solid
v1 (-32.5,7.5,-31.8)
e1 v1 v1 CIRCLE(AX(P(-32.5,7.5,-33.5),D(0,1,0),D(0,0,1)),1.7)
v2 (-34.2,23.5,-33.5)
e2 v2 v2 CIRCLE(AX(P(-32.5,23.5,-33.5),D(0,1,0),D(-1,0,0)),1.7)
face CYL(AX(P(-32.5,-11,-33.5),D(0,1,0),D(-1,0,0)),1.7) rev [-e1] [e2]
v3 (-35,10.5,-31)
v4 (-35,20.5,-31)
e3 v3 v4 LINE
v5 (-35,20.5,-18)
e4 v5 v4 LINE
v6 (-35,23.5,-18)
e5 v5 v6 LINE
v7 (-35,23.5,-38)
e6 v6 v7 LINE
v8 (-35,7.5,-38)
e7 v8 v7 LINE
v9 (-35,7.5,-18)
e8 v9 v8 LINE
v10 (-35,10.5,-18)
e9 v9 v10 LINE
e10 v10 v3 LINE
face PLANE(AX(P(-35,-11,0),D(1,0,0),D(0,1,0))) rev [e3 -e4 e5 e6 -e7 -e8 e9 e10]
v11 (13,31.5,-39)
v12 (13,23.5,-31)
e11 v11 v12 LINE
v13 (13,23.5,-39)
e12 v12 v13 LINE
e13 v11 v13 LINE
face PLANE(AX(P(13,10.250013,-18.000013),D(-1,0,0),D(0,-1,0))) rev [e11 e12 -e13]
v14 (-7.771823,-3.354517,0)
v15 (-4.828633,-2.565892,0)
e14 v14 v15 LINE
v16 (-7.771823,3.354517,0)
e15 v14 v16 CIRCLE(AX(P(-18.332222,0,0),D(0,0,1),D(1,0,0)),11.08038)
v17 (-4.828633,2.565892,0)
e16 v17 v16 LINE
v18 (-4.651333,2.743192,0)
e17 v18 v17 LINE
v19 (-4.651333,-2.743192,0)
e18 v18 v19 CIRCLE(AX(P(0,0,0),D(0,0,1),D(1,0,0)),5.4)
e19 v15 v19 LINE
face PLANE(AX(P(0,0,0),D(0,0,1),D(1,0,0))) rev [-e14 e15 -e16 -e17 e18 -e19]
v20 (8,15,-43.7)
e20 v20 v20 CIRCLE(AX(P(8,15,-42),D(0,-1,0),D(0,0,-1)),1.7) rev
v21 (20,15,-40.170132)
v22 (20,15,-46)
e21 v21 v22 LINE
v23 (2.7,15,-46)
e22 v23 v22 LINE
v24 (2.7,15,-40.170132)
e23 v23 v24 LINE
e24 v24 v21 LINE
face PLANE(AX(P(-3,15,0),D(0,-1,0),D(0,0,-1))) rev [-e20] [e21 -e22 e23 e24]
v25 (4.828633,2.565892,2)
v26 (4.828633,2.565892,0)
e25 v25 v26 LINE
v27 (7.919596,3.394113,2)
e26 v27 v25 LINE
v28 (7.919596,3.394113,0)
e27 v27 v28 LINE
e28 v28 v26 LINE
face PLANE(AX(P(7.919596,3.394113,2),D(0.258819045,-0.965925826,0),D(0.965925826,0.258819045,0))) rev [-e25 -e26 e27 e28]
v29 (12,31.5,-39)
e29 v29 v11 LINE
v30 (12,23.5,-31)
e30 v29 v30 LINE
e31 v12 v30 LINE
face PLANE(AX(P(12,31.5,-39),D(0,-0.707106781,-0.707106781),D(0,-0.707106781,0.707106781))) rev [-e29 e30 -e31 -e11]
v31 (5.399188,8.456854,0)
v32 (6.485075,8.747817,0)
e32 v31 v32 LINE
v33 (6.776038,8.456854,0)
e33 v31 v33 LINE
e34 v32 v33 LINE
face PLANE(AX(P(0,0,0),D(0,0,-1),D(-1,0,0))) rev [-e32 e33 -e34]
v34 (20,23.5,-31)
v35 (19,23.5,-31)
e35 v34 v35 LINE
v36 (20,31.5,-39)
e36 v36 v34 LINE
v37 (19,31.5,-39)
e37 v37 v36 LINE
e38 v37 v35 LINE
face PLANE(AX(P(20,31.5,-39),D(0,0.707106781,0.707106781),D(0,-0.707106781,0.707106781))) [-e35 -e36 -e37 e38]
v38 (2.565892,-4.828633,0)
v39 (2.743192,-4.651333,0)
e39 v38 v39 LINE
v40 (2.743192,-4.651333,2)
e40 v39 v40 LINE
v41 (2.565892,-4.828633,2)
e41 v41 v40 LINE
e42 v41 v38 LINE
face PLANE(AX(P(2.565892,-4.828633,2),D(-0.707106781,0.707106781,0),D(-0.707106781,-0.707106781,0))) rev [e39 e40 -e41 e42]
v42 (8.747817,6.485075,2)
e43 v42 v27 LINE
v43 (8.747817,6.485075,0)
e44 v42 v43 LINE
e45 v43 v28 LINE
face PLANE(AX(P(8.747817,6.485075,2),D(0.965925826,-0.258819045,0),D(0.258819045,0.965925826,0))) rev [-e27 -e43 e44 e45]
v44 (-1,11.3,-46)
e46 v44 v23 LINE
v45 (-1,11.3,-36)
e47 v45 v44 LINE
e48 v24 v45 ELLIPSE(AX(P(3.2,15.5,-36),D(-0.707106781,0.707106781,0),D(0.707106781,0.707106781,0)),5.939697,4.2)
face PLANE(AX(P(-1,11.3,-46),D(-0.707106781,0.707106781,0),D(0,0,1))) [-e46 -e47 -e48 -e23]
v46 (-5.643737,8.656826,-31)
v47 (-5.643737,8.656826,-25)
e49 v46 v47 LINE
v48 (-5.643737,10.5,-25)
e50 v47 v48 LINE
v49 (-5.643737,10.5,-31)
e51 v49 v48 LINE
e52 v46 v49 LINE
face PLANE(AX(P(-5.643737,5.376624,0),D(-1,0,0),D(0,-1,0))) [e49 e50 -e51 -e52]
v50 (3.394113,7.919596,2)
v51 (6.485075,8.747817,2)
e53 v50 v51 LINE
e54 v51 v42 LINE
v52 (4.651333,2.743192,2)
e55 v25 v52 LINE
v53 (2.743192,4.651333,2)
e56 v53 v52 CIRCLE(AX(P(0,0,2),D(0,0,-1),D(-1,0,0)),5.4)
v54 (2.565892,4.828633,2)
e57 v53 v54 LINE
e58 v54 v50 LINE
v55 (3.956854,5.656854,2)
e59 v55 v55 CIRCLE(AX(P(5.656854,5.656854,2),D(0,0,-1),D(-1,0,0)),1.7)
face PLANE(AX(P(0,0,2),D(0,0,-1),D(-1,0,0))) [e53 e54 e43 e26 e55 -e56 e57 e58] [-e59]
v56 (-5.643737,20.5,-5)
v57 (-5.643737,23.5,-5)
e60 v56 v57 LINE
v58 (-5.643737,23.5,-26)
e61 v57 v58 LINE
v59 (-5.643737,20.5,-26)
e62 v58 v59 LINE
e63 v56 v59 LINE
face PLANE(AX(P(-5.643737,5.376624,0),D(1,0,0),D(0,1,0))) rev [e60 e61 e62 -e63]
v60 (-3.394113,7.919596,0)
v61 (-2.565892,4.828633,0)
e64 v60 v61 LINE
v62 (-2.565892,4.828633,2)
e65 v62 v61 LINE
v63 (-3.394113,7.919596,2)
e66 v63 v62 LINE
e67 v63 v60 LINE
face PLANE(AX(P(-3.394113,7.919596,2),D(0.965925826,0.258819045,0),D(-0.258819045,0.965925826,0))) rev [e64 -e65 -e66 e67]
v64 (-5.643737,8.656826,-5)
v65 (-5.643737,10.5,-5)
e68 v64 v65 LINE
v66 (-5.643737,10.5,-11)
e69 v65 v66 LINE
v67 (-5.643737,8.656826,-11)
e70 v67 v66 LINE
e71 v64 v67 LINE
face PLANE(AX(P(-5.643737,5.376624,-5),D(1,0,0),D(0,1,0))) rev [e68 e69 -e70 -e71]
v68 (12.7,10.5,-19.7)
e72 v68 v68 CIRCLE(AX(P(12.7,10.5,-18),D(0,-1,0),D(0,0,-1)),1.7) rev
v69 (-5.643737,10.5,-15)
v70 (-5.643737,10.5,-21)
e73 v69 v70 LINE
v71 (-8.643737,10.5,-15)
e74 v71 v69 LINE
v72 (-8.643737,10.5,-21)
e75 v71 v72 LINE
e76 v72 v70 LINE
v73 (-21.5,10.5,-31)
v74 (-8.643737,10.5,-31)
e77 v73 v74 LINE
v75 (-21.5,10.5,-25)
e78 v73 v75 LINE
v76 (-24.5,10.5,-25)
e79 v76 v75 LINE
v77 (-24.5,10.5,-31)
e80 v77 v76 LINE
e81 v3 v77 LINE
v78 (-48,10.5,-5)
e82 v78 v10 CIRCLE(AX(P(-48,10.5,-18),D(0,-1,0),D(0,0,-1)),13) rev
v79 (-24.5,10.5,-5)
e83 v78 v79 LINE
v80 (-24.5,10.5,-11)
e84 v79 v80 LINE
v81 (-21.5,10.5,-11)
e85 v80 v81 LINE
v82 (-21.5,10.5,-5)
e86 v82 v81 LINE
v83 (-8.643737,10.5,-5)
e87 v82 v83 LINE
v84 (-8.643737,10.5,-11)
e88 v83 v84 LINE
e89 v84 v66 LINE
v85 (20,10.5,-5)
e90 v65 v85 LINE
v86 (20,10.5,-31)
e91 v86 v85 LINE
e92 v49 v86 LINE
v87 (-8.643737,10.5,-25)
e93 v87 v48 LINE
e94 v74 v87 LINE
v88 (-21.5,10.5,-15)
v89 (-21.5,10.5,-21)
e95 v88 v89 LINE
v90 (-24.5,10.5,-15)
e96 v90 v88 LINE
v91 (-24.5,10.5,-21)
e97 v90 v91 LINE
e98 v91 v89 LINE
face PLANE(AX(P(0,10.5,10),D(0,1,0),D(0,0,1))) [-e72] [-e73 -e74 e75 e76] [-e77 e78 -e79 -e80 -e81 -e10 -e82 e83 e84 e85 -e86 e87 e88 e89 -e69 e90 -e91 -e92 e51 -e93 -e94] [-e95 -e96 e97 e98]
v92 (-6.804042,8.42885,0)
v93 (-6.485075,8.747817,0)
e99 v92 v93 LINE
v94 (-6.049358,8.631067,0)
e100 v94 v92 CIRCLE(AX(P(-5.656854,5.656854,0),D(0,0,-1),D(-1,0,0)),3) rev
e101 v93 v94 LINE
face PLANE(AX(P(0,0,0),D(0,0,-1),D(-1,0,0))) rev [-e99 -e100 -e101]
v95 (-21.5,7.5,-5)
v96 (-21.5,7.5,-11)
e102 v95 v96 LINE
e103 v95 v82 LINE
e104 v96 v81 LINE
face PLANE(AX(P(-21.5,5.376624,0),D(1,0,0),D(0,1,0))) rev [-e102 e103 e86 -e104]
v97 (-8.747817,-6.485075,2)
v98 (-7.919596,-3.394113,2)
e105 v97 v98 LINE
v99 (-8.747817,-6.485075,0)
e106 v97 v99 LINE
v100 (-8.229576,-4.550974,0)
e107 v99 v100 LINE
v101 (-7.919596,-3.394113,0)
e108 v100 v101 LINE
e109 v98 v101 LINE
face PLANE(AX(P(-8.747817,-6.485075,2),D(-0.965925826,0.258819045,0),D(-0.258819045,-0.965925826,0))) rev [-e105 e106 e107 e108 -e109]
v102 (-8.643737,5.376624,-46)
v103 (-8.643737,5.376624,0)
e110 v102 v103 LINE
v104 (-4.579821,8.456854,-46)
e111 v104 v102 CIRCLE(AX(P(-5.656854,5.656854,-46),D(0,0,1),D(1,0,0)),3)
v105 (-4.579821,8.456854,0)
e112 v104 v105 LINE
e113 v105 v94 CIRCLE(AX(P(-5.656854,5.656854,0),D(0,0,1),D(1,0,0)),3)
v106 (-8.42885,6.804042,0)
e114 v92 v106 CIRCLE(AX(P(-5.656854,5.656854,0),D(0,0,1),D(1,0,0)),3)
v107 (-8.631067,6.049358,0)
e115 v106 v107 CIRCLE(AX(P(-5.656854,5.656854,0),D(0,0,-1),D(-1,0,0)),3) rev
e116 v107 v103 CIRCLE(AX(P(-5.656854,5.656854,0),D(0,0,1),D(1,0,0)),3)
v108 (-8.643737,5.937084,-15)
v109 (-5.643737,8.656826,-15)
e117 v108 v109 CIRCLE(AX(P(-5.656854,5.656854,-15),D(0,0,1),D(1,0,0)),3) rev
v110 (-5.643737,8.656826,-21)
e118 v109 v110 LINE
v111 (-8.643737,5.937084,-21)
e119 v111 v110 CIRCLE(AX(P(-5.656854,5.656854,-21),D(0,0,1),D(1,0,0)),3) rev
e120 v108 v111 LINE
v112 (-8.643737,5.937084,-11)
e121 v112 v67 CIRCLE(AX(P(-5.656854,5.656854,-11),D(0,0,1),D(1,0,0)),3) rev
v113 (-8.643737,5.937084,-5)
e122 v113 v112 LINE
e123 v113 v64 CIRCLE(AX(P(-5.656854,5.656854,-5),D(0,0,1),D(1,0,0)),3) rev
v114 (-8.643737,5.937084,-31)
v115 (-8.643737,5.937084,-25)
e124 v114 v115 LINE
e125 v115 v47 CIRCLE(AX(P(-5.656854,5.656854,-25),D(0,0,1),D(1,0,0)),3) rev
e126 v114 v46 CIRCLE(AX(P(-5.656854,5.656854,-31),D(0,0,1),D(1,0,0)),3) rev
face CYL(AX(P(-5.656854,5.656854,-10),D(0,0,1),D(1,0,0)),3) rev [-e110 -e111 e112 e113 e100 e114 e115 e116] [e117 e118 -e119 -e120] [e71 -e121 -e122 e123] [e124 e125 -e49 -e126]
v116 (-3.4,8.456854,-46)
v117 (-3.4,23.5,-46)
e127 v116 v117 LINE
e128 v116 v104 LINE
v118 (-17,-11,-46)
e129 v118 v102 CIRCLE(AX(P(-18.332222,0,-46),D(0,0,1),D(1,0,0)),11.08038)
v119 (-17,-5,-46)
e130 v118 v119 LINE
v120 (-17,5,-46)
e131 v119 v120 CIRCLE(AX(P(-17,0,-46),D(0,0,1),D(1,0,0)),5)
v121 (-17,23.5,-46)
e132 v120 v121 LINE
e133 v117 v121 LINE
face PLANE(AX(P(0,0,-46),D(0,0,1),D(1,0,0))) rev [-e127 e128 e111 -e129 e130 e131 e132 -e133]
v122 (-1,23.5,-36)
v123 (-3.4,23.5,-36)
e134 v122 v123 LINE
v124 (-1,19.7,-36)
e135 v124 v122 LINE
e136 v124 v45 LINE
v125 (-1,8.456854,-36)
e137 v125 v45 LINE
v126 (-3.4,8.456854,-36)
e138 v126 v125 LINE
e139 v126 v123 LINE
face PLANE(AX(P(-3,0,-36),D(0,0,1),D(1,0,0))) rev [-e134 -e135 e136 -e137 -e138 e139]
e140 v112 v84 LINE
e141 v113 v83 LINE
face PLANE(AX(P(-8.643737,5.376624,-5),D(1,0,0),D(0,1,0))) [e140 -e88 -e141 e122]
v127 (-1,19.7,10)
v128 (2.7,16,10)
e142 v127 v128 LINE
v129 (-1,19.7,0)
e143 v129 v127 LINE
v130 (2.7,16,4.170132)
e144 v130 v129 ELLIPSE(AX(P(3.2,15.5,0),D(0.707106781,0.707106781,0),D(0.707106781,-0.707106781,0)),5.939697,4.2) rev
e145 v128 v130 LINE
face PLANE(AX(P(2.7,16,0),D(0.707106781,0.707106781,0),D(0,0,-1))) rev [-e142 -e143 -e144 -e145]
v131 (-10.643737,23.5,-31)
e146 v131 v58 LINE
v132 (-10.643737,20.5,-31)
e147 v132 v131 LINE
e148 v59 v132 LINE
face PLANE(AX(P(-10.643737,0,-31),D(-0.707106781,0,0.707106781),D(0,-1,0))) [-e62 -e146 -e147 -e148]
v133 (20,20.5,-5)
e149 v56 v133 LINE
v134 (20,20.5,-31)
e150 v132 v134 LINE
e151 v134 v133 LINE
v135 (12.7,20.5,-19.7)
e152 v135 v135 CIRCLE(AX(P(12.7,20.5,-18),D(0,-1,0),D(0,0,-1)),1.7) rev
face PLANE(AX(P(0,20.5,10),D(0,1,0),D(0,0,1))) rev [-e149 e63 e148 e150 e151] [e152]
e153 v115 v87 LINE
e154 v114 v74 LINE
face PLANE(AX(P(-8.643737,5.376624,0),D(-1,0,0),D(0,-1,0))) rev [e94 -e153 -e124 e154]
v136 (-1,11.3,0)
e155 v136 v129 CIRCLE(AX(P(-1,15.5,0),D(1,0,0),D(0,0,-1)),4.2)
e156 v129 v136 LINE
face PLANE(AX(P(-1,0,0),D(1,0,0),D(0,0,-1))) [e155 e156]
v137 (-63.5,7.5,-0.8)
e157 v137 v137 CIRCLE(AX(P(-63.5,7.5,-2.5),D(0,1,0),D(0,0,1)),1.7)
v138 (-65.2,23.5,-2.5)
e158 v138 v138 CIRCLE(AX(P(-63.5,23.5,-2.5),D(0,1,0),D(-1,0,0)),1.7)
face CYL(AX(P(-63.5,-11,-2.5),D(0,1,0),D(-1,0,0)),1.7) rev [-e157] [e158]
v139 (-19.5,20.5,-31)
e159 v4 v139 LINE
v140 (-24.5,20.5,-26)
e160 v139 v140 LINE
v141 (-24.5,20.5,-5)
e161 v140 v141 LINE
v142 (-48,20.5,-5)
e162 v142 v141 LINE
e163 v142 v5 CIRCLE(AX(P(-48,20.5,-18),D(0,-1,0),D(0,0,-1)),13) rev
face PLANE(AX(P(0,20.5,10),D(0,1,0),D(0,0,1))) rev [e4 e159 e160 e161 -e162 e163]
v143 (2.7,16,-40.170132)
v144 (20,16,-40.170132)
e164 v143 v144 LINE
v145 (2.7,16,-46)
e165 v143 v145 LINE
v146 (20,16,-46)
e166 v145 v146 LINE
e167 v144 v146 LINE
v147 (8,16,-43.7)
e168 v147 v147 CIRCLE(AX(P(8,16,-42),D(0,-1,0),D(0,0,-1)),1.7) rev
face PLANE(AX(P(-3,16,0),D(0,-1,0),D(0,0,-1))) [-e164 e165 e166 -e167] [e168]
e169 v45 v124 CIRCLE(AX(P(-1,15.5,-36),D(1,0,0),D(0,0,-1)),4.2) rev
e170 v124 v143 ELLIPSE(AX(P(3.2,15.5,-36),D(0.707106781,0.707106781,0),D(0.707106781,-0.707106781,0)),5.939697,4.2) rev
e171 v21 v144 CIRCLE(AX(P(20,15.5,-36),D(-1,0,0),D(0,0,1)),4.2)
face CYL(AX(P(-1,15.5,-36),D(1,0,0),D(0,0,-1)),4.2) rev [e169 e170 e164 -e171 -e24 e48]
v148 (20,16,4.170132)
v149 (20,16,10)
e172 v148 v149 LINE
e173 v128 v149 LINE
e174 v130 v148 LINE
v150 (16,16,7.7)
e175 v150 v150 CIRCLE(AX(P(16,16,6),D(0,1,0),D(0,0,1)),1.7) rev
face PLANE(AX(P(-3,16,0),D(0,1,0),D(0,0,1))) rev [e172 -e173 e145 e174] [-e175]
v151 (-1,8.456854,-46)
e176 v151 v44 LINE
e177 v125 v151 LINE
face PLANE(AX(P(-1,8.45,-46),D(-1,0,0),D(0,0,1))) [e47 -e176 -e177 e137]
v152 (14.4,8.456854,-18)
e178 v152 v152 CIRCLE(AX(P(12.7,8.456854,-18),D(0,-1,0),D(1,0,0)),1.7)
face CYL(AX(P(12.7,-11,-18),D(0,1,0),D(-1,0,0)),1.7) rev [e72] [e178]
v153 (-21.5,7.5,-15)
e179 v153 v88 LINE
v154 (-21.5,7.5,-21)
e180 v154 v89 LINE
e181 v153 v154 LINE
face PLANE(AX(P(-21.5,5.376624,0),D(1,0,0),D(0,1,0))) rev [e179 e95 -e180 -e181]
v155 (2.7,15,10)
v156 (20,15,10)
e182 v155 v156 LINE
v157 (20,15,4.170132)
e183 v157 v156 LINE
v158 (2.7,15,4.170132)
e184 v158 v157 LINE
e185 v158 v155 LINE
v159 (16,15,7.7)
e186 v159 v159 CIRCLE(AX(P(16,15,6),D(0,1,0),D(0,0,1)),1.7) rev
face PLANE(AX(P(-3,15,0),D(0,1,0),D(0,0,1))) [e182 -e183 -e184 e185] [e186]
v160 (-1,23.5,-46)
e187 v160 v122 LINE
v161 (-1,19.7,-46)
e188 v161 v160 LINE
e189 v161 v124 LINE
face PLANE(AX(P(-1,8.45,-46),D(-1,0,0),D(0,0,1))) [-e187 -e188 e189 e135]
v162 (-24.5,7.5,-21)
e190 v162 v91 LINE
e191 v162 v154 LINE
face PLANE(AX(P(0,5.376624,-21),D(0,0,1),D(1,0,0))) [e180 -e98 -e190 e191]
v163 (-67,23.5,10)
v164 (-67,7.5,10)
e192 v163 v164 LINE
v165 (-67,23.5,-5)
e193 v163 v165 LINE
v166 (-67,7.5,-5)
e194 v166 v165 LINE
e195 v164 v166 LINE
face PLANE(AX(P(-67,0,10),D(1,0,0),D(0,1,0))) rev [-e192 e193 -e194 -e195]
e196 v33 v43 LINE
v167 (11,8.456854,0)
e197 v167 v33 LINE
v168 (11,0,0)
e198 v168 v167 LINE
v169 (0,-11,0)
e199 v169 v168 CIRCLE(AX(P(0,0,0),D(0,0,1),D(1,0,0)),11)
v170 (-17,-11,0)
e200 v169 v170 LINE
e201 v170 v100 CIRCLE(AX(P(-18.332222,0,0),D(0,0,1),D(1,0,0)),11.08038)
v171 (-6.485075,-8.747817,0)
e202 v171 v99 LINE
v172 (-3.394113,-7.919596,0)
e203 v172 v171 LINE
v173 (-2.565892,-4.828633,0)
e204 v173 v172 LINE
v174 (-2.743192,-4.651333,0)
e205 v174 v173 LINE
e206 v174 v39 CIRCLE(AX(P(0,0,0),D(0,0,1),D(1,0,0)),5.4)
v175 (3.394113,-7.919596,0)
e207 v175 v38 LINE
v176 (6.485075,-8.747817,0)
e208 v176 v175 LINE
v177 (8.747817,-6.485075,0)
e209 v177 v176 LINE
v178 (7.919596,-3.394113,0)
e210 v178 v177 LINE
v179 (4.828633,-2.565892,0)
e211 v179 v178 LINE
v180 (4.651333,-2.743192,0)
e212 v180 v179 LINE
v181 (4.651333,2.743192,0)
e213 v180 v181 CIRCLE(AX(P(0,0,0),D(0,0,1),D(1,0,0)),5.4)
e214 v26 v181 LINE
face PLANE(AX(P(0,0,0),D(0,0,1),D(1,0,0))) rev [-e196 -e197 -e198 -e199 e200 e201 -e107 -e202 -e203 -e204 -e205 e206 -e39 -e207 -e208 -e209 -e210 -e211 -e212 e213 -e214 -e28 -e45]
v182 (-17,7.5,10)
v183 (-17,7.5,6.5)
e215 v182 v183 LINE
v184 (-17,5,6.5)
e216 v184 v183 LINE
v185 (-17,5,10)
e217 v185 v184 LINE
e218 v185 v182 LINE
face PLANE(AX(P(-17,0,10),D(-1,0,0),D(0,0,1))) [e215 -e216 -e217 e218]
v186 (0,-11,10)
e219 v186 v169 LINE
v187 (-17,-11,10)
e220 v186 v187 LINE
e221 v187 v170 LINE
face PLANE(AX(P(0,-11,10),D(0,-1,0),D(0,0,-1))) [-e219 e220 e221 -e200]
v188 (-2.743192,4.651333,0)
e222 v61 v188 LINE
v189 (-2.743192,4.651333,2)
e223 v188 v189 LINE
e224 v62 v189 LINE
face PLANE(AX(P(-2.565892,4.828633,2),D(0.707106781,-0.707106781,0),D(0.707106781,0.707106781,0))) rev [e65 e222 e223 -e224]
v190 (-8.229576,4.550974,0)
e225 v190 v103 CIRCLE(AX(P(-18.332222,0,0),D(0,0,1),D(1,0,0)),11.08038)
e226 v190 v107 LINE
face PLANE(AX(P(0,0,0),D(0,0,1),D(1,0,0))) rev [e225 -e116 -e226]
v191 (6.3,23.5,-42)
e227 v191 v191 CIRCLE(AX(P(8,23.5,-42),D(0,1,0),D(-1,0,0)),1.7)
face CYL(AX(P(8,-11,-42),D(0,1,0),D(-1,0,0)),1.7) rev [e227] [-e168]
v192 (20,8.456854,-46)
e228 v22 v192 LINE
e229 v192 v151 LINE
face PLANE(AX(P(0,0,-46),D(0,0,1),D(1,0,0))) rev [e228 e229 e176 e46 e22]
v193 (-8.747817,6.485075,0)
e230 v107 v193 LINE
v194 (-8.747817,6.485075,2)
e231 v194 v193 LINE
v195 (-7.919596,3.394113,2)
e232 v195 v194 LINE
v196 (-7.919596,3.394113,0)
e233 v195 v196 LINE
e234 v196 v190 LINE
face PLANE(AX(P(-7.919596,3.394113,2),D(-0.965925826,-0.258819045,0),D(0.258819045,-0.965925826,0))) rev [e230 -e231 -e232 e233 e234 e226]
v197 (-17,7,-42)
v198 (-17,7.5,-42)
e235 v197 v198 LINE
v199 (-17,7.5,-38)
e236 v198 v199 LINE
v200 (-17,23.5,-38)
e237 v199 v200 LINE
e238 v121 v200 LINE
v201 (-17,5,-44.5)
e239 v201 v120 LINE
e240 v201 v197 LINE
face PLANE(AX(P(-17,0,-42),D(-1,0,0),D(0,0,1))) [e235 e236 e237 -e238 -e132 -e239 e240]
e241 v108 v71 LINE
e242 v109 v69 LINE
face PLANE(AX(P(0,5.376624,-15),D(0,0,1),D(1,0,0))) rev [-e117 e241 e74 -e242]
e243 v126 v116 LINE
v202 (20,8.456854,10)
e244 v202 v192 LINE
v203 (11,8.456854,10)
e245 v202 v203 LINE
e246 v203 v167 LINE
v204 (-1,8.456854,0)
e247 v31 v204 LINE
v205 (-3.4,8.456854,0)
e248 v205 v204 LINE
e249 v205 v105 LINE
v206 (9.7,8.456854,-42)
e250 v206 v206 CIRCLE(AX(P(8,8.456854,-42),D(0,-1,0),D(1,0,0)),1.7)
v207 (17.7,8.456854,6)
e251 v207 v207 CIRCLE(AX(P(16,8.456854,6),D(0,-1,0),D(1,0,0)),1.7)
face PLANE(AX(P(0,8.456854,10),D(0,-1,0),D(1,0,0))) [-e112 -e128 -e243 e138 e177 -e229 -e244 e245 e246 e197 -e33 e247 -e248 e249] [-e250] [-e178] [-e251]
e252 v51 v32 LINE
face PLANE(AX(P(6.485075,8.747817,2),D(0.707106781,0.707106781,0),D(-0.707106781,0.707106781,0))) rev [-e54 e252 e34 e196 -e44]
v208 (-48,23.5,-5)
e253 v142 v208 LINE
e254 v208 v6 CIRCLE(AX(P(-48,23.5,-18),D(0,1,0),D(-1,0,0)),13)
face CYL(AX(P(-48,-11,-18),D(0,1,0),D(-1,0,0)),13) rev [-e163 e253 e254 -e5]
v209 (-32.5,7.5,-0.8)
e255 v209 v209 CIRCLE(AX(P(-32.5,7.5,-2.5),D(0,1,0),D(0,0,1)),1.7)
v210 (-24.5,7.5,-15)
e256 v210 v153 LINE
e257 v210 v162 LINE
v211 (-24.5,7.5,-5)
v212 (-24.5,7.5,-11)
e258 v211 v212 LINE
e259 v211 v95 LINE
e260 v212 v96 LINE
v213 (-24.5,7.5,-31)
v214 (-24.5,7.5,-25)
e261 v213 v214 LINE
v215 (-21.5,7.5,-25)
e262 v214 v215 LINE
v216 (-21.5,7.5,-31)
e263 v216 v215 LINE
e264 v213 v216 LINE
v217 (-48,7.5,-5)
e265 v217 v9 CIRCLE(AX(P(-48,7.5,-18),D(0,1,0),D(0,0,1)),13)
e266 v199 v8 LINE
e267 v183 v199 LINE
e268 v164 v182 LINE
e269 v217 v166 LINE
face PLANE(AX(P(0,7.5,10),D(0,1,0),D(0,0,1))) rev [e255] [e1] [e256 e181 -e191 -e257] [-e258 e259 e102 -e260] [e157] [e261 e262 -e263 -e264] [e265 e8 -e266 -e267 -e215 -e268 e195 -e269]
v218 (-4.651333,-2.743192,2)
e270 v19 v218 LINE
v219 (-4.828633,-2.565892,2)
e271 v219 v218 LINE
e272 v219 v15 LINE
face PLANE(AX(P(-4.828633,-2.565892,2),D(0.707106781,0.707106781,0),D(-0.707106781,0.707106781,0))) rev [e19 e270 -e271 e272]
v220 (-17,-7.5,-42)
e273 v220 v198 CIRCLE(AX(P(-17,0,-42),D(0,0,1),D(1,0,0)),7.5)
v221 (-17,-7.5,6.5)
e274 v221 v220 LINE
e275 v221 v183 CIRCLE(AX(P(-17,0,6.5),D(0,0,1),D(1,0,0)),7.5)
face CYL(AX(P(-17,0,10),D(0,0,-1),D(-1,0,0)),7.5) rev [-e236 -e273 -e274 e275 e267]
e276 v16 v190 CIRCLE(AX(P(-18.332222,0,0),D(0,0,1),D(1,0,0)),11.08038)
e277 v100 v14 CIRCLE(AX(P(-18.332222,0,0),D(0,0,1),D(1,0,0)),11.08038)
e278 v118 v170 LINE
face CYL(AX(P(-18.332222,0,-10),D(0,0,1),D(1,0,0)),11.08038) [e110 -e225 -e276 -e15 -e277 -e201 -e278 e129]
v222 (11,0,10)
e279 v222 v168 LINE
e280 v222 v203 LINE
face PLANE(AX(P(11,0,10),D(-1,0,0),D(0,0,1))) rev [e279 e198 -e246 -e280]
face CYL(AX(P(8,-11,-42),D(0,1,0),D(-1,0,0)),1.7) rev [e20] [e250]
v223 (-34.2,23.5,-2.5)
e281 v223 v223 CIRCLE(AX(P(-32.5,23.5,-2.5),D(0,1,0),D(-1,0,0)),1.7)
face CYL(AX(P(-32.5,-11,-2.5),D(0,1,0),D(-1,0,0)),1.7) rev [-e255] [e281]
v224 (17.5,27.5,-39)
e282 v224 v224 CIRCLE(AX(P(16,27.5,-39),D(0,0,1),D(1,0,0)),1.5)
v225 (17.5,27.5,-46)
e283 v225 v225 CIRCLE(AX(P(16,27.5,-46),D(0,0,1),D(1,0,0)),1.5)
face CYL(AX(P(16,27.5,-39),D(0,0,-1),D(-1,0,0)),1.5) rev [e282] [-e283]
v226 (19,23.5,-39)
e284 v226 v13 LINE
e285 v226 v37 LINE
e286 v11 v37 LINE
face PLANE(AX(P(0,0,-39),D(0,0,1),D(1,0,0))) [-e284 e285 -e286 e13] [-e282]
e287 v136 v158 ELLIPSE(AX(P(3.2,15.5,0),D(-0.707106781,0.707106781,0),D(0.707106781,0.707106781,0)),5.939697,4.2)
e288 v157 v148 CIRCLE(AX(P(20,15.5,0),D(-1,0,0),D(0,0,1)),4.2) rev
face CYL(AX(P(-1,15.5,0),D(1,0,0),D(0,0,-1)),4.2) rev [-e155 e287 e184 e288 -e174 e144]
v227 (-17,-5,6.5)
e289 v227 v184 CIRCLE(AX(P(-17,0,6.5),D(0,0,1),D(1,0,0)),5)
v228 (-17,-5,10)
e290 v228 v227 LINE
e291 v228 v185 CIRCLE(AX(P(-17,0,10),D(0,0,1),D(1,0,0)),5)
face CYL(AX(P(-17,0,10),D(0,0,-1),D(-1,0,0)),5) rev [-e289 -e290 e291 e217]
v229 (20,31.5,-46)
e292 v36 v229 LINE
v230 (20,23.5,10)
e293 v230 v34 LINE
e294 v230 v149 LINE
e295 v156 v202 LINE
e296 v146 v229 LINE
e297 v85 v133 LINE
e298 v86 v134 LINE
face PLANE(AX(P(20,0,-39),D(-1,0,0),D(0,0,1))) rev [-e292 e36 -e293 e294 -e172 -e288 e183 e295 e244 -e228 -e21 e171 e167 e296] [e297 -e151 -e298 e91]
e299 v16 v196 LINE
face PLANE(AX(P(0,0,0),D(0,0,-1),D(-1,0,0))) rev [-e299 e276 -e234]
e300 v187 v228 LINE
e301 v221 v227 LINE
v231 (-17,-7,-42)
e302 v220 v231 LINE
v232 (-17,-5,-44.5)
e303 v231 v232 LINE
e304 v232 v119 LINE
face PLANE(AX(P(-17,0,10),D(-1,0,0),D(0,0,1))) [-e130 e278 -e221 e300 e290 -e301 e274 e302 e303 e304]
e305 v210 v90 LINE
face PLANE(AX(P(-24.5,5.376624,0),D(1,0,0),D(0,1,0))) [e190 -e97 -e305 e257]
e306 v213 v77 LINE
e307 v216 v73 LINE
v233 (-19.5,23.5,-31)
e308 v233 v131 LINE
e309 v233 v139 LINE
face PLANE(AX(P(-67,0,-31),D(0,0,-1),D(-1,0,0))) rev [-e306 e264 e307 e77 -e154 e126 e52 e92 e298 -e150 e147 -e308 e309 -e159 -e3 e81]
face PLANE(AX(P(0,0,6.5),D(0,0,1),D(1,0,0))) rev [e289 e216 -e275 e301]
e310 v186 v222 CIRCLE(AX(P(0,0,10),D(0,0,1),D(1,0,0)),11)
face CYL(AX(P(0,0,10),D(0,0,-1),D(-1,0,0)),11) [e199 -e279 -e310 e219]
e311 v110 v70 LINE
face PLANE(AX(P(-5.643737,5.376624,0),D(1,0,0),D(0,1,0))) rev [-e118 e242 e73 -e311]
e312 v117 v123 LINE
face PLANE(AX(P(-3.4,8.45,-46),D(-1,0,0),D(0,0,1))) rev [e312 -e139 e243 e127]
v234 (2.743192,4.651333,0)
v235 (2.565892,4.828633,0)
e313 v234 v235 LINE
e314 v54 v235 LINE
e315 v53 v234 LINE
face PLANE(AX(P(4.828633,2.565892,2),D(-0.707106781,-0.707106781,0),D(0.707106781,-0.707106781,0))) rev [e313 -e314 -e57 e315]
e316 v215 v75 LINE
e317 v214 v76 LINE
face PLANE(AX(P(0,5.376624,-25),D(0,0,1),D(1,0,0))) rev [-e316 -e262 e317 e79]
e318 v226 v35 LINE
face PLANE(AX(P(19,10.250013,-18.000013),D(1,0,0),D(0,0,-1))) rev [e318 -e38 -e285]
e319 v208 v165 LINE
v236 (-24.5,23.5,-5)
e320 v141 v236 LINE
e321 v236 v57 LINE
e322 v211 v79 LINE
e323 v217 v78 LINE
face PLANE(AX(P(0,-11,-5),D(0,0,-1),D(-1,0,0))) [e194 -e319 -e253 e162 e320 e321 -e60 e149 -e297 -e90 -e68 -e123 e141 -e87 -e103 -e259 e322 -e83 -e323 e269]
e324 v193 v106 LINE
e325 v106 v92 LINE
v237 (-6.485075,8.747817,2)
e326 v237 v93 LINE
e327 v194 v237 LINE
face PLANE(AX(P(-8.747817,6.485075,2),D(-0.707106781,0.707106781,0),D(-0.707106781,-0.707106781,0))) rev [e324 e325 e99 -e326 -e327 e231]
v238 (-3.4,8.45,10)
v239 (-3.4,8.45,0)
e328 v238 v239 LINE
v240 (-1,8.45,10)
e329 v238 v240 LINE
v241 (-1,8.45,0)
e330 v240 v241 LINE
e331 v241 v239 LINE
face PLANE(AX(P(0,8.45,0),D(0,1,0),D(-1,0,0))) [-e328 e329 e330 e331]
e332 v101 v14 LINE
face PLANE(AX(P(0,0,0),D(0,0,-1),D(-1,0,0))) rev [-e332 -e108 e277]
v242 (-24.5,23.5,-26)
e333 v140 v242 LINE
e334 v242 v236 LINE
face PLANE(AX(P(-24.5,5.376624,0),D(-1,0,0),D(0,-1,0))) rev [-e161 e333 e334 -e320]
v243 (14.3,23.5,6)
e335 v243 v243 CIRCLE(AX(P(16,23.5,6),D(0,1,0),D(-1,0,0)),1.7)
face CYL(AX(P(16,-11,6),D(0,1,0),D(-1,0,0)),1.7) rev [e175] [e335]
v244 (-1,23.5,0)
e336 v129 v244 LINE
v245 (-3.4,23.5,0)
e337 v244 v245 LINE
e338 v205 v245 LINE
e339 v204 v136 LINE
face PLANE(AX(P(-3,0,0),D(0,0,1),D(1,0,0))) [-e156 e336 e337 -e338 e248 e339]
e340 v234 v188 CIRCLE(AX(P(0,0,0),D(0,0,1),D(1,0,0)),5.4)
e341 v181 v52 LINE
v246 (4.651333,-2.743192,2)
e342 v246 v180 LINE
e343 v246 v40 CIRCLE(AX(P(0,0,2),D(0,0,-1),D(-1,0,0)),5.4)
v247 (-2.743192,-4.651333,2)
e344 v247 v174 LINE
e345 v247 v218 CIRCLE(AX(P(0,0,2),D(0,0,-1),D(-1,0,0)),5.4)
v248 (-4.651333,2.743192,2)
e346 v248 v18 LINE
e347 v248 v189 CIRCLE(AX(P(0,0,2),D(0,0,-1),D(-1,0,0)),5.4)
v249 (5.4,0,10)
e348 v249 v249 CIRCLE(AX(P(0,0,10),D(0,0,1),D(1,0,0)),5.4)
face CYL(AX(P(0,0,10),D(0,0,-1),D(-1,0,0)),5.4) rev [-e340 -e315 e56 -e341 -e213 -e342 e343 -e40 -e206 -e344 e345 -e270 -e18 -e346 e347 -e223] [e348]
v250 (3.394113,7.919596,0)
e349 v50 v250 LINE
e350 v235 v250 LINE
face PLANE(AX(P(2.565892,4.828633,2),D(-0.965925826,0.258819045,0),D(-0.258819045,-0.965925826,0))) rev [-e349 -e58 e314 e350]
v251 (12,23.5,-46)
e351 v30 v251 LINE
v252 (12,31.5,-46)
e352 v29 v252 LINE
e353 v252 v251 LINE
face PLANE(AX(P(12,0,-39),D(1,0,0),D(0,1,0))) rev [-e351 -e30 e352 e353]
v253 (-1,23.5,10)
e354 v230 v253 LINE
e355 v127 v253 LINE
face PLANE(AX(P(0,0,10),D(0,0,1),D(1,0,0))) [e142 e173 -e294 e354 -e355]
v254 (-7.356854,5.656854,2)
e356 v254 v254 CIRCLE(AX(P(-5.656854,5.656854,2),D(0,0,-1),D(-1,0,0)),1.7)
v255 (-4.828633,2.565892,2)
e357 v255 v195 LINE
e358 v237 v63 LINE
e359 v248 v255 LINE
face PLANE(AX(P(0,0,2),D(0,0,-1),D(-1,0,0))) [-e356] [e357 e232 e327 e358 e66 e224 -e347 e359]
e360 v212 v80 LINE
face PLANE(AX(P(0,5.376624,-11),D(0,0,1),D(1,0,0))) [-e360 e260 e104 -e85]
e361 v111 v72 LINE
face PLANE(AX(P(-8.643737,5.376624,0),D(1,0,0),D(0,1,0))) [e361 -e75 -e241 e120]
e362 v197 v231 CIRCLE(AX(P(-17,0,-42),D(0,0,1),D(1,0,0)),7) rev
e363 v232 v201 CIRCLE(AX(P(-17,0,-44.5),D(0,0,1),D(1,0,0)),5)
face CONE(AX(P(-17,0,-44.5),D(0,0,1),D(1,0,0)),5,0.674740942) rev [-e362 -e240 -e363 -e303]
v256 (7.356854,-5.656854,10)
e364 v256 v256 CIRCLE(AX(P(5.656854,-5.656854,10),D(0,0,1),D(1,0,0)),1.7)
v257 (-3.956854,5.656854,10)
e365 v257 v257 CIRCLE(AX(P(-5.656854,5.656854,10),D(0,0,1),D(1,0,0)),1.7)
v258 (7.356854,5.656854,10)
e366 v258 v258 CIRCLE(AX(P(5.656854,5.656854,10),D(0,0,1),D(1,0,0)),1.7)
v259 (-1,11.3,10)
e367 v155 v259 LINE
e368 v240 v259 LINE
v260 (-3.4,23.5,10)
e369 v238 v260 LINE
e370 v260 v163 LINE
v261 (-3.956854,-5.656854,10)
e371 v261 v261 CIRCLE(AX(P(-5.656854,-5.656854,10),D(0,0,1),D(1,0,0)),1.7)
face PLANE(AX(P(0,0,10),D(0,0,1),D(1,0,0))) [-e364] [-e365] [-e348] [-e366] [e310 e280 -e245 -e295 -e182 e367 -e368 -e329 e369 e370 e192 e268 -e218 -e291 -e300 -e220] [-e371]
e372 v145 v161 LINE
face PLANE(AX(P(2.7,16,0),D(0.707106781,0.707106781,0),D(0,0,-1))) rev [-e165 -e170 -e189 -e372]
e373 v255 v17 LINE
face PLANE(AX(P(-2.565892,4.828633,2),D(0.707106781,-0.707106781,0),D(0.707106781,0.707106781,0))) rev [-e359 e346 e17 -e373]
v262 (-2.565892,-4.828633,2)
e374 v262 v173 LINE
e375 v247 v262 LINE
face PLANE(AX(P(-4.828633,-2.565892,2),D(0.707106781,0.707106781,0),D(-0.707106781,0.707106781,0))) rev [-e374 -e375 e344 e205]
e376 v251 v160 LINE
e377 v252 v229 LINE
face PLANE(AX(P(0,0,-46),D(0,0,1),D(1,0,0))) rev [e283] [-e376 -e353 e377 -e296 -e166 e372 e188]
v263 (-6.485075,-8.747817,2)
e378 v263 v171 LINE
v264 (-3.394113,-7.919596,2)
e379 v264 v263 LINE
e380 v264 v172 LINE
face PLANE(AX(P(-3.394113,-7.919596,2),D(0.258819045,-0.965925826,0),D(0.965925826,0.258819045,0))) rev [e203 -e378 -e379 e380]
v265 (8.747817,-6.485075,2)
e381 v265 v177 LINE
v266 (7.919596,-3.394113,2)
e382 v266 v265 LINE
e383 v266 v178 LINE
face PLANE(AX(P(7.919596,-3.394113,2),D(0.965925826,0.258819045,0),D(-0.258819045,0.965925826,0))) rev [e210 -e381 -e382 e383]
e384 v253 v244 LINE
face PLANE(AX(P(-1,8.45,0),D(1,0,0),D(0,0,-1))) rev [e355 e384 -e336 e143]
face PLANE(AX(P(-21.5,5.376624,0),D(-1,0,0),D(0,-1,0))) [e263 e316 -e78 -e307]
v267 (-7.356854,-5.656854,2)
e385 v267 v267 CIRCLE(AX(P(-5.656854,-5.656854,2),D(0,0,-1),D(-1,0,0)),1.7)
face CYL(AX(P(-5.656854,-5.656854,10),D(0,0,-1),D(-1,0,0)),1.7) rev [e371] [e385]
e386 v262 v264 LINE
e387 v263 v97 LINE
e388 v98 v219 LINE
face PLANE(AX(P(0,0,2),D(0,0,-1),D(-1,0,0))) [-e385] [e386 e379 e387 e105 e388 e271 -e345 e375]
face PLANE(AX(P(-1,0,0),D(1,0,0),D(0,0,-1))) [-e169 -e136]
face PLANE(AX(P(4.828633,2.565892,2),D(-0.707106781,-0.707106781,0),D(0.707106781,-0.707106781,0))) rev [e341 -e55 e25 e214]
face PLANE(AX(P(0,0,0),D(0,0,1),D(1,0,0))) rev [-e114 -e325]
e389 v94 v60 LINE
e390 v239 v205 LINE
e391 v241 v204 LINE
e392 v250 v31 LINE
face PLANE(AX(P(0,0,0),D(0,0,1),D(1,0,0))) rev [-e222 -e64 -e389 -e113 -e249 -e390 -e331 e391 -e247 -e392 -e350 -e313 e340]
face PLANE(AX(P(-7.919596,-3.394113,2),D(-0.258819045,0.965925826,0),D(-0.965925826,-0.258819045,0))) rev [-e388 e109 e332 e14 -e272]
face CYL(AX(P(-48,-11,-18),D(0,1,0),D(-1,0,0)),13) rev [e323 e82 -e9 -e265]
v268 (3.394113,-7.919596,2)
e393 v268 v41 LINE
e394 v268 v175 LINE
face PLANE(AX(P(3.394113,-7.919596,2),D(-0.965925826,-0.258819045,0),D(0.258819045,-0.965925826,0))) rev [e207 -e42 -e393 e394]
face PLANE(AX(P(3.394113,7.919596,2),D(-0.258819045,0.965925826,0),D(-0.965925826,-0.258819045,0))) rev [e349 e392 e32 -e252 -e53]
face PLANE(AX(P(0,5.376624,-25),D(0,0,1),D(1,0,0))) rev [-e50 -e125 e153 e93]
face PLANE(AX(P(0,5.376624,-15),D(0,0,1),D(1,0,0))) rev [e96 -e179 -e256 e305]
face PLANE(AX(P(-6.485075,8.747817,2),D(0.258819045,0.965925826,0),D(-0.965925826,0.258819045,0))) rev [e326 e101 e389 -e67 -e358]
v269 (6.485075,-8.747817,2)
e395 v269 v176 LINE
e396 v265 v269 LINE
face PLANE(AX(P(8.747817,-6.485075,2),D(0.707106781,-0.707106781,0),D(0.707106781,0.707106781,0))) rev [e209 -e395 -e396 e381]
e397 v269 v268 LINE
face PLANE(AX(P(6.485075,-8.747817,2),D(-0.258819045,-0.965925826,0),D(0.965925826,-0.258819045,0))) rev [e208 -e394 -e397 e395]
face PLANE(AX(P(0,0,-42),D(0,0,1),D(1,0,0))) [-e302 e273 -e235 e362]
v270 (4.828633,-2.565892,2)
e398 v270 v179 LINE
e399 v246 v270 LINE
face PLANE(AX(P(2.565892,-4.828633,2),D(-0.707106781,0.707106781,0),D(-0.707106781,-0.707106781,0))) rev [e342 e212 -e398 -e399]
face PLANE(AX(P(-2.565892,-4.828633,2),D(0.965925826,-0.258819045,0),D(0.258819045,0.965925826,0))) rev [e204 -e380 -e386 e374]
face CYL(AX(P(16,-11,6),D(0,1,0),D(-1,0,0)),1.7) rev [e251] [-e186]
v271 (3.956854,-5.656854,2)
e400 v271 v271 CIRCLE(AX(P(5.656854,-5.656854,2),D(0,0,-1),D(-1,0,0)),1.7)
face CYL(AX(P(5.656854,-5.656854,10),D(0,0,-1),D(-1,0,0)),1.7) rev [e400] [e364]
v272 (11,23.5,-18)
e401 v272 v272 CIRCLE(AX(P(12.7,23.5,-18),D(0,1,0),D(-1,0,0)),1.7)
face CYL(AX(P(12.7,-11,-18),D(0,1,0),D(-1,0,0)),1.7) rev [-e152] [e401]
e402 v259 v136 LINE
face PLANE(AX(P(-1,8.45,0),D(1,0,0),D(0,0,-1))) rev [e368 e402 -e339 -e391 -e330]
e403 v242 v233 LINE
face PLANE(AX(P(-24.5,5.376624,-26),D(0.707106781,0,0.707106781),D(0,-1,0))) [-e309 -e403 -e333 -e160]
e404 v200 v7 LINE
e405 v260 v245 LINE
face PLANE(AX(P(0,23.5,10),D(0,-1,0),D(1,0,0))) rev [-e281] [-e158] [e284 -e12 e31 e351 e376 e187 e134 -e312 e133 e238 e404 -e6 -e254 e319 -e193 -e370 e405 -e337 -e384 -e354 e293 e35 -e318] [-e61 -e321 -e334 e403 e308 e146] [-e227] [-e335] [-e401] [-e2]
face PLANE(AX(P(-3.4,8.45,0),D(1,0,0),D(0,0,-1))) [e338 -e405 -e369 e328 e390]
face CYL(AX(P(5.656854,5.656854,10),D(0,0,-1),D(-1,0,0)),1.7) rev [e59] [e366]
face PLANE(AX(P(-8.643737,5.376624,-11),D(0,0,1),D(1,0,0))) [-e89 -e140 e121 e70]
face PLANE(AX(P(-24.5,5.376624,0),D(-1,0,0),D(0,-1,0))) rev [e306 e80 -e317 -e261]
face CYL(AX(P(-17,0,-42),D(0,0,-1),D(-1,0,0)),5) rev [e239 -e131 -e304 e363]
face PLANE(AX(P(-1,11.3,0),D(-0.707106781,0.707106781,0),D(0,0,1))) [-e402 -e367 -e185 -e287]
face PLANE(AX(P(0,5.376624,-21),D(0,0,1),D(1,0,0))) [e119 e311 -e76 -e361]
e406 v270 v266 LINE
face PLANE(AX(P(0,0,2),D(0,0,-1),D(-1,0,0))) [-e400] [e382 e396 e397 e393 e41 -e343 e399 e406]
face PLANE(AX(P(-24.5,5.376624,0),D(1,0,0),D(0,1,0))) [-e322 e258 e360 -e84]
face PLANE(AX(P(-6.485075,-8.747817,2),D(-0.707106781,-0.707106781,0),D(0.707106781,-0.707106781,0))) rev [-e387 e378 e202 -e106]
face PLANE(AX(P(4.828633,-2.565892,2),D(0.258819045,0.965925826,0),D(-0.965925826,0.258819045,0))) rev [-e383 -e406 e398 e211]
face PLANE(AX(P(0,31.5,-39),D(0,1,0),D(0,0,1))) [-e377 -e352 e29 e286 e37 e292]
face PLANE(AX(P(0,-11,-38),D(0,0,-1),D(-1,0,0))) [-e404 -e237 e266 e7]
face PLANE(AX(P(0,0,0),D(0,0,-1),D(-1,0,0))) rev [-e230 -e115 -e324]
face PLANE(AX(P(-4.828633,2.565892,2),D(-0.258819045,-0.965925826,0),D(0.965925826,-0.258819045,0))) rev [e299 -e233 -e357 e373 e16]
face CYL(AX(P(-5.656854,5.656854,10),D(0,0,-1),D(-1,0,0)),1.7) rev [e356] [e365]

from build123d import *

# Parameters (mm, degrees)
SKETCH_1_R           = 1.7
SKETCH_1_R_2         = 5.4
EXTRUDE_1_DEPTH      = 10
EXTRUDE_START        = -10
EXTRUDE_2_DEPTH      = 10
CUT_EXTRUDE_1_DEPTH  = 2
EXTRUDE_START_2      = -46
EXTRUDE_3_DEPTH      = 36
EXTRUDE_START_3      = 6.5
EXTRUDE_4_DEPTH      = 3.5
EXTRUDE_5_DEPTH      = 4
SKETCH_1_10_W        = 8
SKETCH_1_10_H        = 8
SKETCH_1_10_R        = 1.5
EXTRUDE_6_DEPTH      = 7
RIB_2_REACH          = 105.331
SKETCH_4_WALL_W      = 219.975267576
SKETCH_4_WALL_H      = 1
RIB_START            = -1
RIB_3_DEPTH          = 1
EXTRUDE_START_4      = -0.4
SKETCH_6_R           = 1.5
EXTRUDE_7_DEPTH      = 0.4
SKETCH_7_R           = 1.7
SKETCH_7_R_2         = 1.35
CUT_EXTRUDE_2_DEPTH  = 89.290712988
SKETCH_8_W           = 26
SKETCH_8_H           = 10
CUT_EXTRUDE_3_DEPTH  = 105.174133066
CUT_EXTRUDE_4_DEPTH  = 22
CUT_EXTRUDE_5_DEPTH  = 24
SKETCH_7_4_W         = 2.4
SKETCH_7_4_H         = 10
CUT_EXTRUDE_9_DEPTH  = 15.05
CHAMFER_1_SIZE       = 3.7
CUT_EXTRUDE_START    = -17.562916
SKETCH_7_5_W         = 3
SKETCH_7_5_H         = 6
CUT_EXTRUDE_10_DEPTH = 17.562916
CUT_EXTRUDE_11_REACH = 90.291
CHAMFER_2_SIZE       = 5
CHAMFER_3_SIZE       = 2
CHAMFER_3_SIZE2      = 2.5
SKETCH_9_W           = 11.322924712
SKETCH_9_H           = 24.282583949
CUT_EXTRUDE_12_DEPTH = 93.82914413
CUT_EXTRUDE_START_2  = -49
SKETCH_1_14_R        = 1.5
CUT_EXTRUDE_13_DEPTH = 10


# Read off the part's stored shape, not the designer's step: 筋3
with BuildPart() as part:
    # 草图1 → 凸台-拉伸1 (new body)
    with BuildSketch(Plane.XY):
        with BuildLine():
            Line((-17, -7.5), (-17, -11))
            Line((-17, -11), (0, -11))
            ThreePointArc((0, -11), (7.778174593, -7.778174593), (11, 0))
            Line((11, 0), (11, 8.456854249))
            Line((11, 8.456854249), (28, 8.456854249))
            Line((28, 8.456854249), (28, 10.5))
            Line((28, 10.5), (21, 10.5))
            Line((21, 10.5), (21, 20.5))
            Line((21, 20.5), (28, 20.5))
            Line((28, 20.5), (28, 23.5))
            Line((28, 23.5), (-67, 23.5))
            Line((-67, 23.5), (-67, 7.5))
            Line((-67, 7.5), (-17, 7.5))
            ThreePointArc((-17, 7.5), (-9.5, 0), (-17, -7.5))
        make_face()
        with Locations((-5.656854249, -5.656854249)):
            Circle(SKETCH_1_R, mode=Mode.SUBTRACT)
        with Locations((5.656854249, -5.656854249)):
            Circle(SKETCH_1_R, mode=Mode.SUBTRACT)
        Circle(SKETCH_1_R_2, mode=Mode.SUBTRACT)
        with Locations((-5.656854249, 5.656854249)):
            Circle(SKETCH_1_R, mode=Mode.SUBTRACT)
        with Locations((5.656854249, 5.656854249)):
            Circle(SKETCH_1_R, mode=Mode.SUBTRACT)
    extrude(amount=EXTRUDE_1_DEPTH)

    # 草图1<6> → 凸台-拉伸2 (add)
    with BuildSketch(Plane.XY.offset(EXTRUDE_START)):
        with BuildLine():
            Line((21, 10.5), (21, 20.5))
            Line((21, 20.5), (28, 20.5))
            Line((28, 20.5), (28, 23.5))
            Line((28, 23.5), (-67, 23.5))
            Line((-67, 23.5), (-67, 7.5))
            Line((-67, 7.5), (-17, 7.5))
            ThreePointArc((-17, 7.5), (-9.5, 0), (-17, -7.5))
            Line((-17, -7.5), (-17, -11))
            ThreePointArc((-17, -11), (-8.462447466, -5.036106671), (-8.643737412, 5.376624039))
            ThreePointArc((-8.643737412, 5.376624039), (-7.46899014, 8.047704206), (-4.579821288, 8.456854249))
            Line((-4.579821288, 8.456854249), (28, 8.456854249))
            Line((28, 8.456854249), (28, 10.5))
            Line((28, 10.5), (21, 10.5))
        make_face()
    extrude(amount=EXTRUDE_2_DEPTH)

    # 草图3 → 切除-拉伸1 (cut)
    with BuildSketch(Plane(origin=(0, 0, 0), x_dir=(-1, 0, 0), z_dir=(0, 0, -1))):
        Polygon((7.919595949, 3.39411255), (8.747816894, 6.485075194), (6.485075194, 8.747816894), (3.39411255, 7.919595949), (2.565891605, 4.828633305), (4.828633305, 2.565891605), align=None)
        Polygon((-2.565891605, 4.828633305), (-3.39411255, 7.919595949), (-6.485075194, 8.747816894), (-8.747816894, 6.485075194), (-7.919595949, 3.39411255), (-4.828633305, 2.565891605), align=None)
        Polygon((-3.39411255, -7.919595949), (-2.565891605, -4.828633305), (-4.828633305, -2.565891605), (-7.919595949, -3.39411255), (-8.747816894, -6.485075194), (-6.485075194, -8.747816894), align=None)
        Polygon((2.565891605, -4.828633305), (3.39411255, -7.919595949), (6.485075194, -8.747816894), (8.747816894, -6.485075194), (7.919595949, -3.39411255), (4.828633305, -2.565891605), align=None)
    extrude(amount=-CUT_EXTRUDE_1_DEPTH, mode=Mode.SUBTRACT)

    # 草图1<7> → 凸台-拉伸3 (add)
    with BuildSketch(Plane.XY.offset(EXTRUDE_START_2)):
        with BuildLine():
            Line((21, 8.456854249), (21, 23.5))
            Line((21, 23.5), (-67, 23.5))
            Line((-67, 23.5), (-67, 7.5))
            Line((-67, 7.5), (-17, 7.5))
            ThreePointArc((-17, 7.5), (-9.5, 0), (-17, -7.5))
            Line((-17, -7.5), (-17, -11))
            ThreePointArc((-17, -11), (-8.462447466, -5.036106671), (-8.643737412, 5.376624039))
            ThreePointArc((-8.643737412, 5.376624039), (-7.46899014, 8.047704206), (-4.579821288, 8.456854249))
            Line((-4.579821288, 8.456854249), (21, 8.456854249))
        make_face()
    extrude(amount=EXTRUDE_3_DEPTH)

    # 草图1<8> → 凸台-拉伸4 (add)
    with BuildSketch(Plane.XY.offset(EXTRUDE_START_3)):
        with BuildLine():
            Line((-17, -5), (-17, -7.5))
            ThreePointArc((-17, -7.5), (-9.5, 0), (-17, 7.5))
            Line((-17, 7.5), (-17, 5))
            ThreePointArc((-17, 5), (-12, 0), (-17, -5))
        make_face()
    extrude(amount=EXTRUDE_4_DEPTH)

    # 草图1<9> → 凸台-拉伸5 (add)
    with BuildSketch(Plane.XY.offset(EXTRUDE_START_2)):
        with BuildLine():
            Line((-17, -5), (-17, -7.5))
            ThreePointArc((-17, -7.5), (-9.5, 0), (-17, 7.5))
            Line((-17, 7.5), (-17, 5))
            ThreePointArc((-17, 5), (-12, 0), (-17, -5))
        make_face()
    extrude(amount=EXTRUDE_5_DEPTH)

    # 草图1<10> → 凸台-拉伸6 (add)
    with BuildSketch(Plane.XY.offset(EXTRUDE_START_2)):
        with Locations((16, 27.5)):
            Rectangle(SKETCH_1_10_W, SKETCH_1_10_H)
        with Locations((16, 27.5)):
            Circle(SKETCH_1_10_R, mode=Mode.SUBTRACT)
    extrude(amount=EXTRUDE_6_DEPTH)

    # 草图4 wall → 筋2 (add, up to next)
    with BuildSketch(Plane(origin=(20, 27.5, -35), x_dir=(0, -0.707106781187, 0.707106781187), z_dir=(0, -0.707106781187, -0.707106781187)), mode=Mode.PRIVATE) as rib_2_sk1:
        with Locations((0, 0.5)):
            Rectangle(SKETCH_4_WALL_W, SKETCH_4_WALL_H)
    rib_2_tool1 = extrude(rib_2_sk1.sketch, amount=RIB_2_REACH, mode=Mode.PRIVATE) - part.part
    add(rib_2_tool1.solids().sort_by_distance((20, 27.5, -35))[0])

    # 筋3 outline → 筋3 (add)
    with BuildSketch(Plane.ZY.offset(-12).offset(RIB_START)):
        Polygon((-31, 23.5), (-39, 31.5), (-39, 23.5), align=None)
    extrude(amount=RIB_3_DEPTH)

    # 草图6 → 凸台-拉伸7 (add)
    with BuildSketch(Plane.XY.offset(-39).offset(EXTRUDE_START_4)):
        with Locations((16, 27.5)):
            Circle(SKETCH_6_R)
    extrude(amount=EXTRUDE_7_DEPTH)

    # 草图7 → 切除-拉伸2 (cut, through all)
    with BuildSketch(Plane(origin=(0, 23.5, 0), x_dir=(1, 0, 0), z_dir=(0, 1, 0))):
        with BuildLine():
            Line((-17, 38), (-17, 46))
            Line((-17, 46), (-69, 46))
            Line((-69, 46), (-69, 5))
            Line((-69, 5), (-48, 5))
            ThreePointArc((-48, 5), (-38.807611845, 8.807611845), (-35, 18))
            Line((-35, 18), (-35, 38))
            Line((-35, 38), (-17, 38))
        make_face()
        with Locations(Location((12.7, 18, 0), (0, 0, 180))):
            Circle(SKETCH_7_R)
        with Locations(Location((16, -6, 0), (0, 0, 180))):
            Circle(SKETCH_7_R)
        with Locations(Location((8, 42, 0), (0, 0, 180))):
            Circle(SKETCH_7_R)
        with Locations(Location((-32.5, 2.5, 0), (0, 0, 180))):
            Circle(SKETCH_7_R)
        with Locations(Location((-63.5, 2.5, 0), (0, 0, 180))):
            Circle(SKETCH_7_R)
        with Locations(Location((-32.5, 33.5, 0), (0, 0, 180))):
            Circle(SKETCH_7_R)
        with Locations(Location((24.5, -5, 0), (0, 0, 180))):
            Circle(SKETCH_7_R_2)
        with Locations(Location((24.5, 5, 0), (0, 0, 270))):
            Circle(SKETCH_7_R_2)
    extrude(amount=-CUT_EXTRUDE_2_DEPTH, mode=Mode.SUBTRACT)

    # 草图8 → 切除-拉伸3 (cut, through all)
    with BuildSketch(Plane(origin=(21, 0, 0), x_dir=(0, 0, -1), z_dir=(1, 0, 0))):
        with Locations((18, 15.5)):
            Rectangle(SKETCH_8_W, SKETCH_8_H)
    extrude(amount=-CUT_EXTRUDE_3_DEPTH, mode=Mode.SUBTRACT)

    # 草图8<3> → 切除-拉伸4 (cut)
    with BuildSketch(Plane(origin=(21, 0, 0), x_dir=(0, 0, -1), z_dir=(1, 0, 0))):
        with BuildLine():
            ThreePointArc((36, 19.7), (31.8, 15.5), (36, 11.3))
            Line((36, 11.3), (36, 19.7))
        make_face()
        with BuildLine():
            ThreePointArc((4.2, 15.5), (2.969848481, 18.469848481), (0, 19.7))
            Line((0, 19.7), (0, 11.3))
            ThreePointArc((0, 11.3), (2.969848481, 12.530151519), (4.2, 15.5))
        make_face()
    extrude(amount=-CUT_EXTRUDE_4_DEPTH, mode=Mode.SUBTRACT)

    # 草图8<4> → 切除-拉伸5 (cut)
    with BuildSketch(Plane(origin=(21, 0, 0), x_dir=(0, 0, -1), z_dir=(1, 0, 0))):
        with BuildLine():
            Line((0, 11.3), (0, 19.7))
            ThreePointArc((0, 19.7), (-2.787471973, 18.641655614), (-4.170131892, 16))
            Line((-4.170131892, 16), (-10, 16))
            Line((-10, 16), (-10, 15))
            Line((-10, 15), (-4.170131892, 15))
            ThreePointArc((-4.170131892, 15), (-2.787471973, 12.358344386), (0, 11.3))
        make_face()
        with BuildLine():
            Line((40.170131892, 15), (46, 15))
            Line((46, 15), (46, 16))
            Line((46, 16), (40.170131892, 16))
            ThreePointArc((40.170131892, 16), (38.787471973, 18.641655614), (36, 19.7))
            Line((36, 19.7), (36, 11.3))
            ThreePointArc((36, 11.3), (38.787471973, 12.358344386), (40.170131892, 15))
        make_face()
    extrude(amount=-CUT_EXTRUDE_5_DEPTH, mode=Mode.SUBTRACT)

    # 草图7<4> → 切除-拉伸9 (cut)
    with BuildSketch(Plane(origin=(0, 23.5, 0), x_dir=(1, 0, 0), z_dir=(0, 1, 0))):
        with Locations((-2.2, -5)):
            Rectangle(SKETCH_7_4_W, SKETCH_7_4_H)
        with Locations((-2.2, 41)):
            Rectangle(SKETCH_7_4_W, SKETCH_7_4_H)
    extrude(amount=-CUT_EXTRUDE_9_DEPTH, mode=Mode.SUBTRACT)

    # 倒角1
    chamfer_1_edges = [part.edges().sort_by_distance(p)[0] for p in [
        (-1, 16, -43.085065946),
        (-1, 15, -43.085065946),
        (-1, 16, 7.085065946),
        (-1, 15, 7.085065946),
    ]]
    chamfer(chamfer_1_edges, length=CHAMFER_1_SIZE)

    # 草图7<5> → 切除-拉伸10 (cut)
    with BuildSketch(Plane(origin=(0, 23.5, 0), x_dir=(1, 0, 0), z_dir=(0, 1, 0)).offset(CUT_EXTRUDE_START)):
        with Locations((-7.143737412, 18)):
            Rectangle(SKETCH_7_5_W, SKETCH_7_5_H)
        with Locations((-7.143737412, 28)):
            Rectangle(SKETCH_7_5_W, SKETCH_7_5_H)
        with Locations((-23, 28)):
            Rectangle(SKETCH_7_5_W, SKETCH_7_5_H)
        with Locations((-23, 18)):
            Rectangle(SKETCH_7_5_W, SKETCH_7_5_H)
        with Locations((-23, 8)):
            Rectangle(SKETCH_7_5_W, SKETCH_7_5_H)
        with Locations((-7.143737412, 8)):
            Rectangle(SKETCH_7_5_W, SKETCH_7_5_H)
    extrude(amount=CUT_EXTRUDE_10_DEPTH, mode=Mode.SUBTRACT)

    # 草图7<6> → 切除-拉伸11 (cut, up to next)
    with BuildSketch(Plane(origin=(0, 23.5, 0), x_dir=(1, 0, 0), z_dir=(0, 1, 0)), mode=Mode.PRIVATE) as cut_extrude_11_sk1:
        Polygon((-21.5, 5), (-8.643737412, 5), (-8.643737412, 11), (-5.643737412, 11), (-5.643737412, 15), (-8.643737412, 15), (-8.643737412, 21), (-5.643737412, 21), (-5.643737412, 25), (-8.643737412, 25), (-8.643737412, 31), (-21.5, 31), (-21.5, 25), (-24.5, 25), (-24.5, 21), (-21.5, 21), (-21.5, 15), (-24.5, 15), (-24.5, 11), (-21.5, 11), align=None)
    cut_extrude_11_tool1 = extrude(cut_extrude_11_sk1.sketch, amount=-CUT_EXTRUDE_11_REACH, mode=Mode.PRIVATE) & part.part
    add(cut_extrude_11_tool1.solids().sort_by_distance((-15.071869, 23.5, -18))[0], mode=Mode.SUBTRACT)

    # 倒角2
    chamfer_2_edges = [part.edges().sort_by_distance(p)[0] for p in [
        (-5.643737412, 22, -31),
        (-24.5, 22, -31),
    ]]
    chamfer(chamfer_2_edges, length=CHAMFER_2_SIZE)

    # 倒角3
    chamfer_3_edges = [part.edges().sort_by_distance(p)[0] for p in [
        (-12, 0, -42),
    ]]
    chamfer_3_side = [part.faces().sort_by_distance(p)[0] for p in [
        (-9.667705098, 0, -42),
    ]]
    chamfer(chamfer_3_edges, length=CHAMFER_3_SIZE, length2=CHAMFER_3_SIZE2, reference=chamfer_3_side[0])

    # 草图9 → 切除-拉伸12 (cut, through all)
    with BuildSketch(Plane.XY.offset(10)):
        with Locations((25.661462356, 19.358708026)):
            Rectangle(SKETCH_9_W, SKETCH_9_H)
    extrude(amount=-CUT_EXTRUDE_12_DEPTH, mode=Mode.SUBTRACT)

    # 草图1<14> → 切除-拉伸13 (cut)
    with BuildSketch(Plane.XY.offset(CUT_EXTRUDE_START_2)):
        with Locations((16, 27.5)):
            Circle(SKETCH_1_14_R)
    extrude(amount=CUT_EXTRUDE_13_DEPTH, mode=Mode.SUBTRACT)


solid = part.part
